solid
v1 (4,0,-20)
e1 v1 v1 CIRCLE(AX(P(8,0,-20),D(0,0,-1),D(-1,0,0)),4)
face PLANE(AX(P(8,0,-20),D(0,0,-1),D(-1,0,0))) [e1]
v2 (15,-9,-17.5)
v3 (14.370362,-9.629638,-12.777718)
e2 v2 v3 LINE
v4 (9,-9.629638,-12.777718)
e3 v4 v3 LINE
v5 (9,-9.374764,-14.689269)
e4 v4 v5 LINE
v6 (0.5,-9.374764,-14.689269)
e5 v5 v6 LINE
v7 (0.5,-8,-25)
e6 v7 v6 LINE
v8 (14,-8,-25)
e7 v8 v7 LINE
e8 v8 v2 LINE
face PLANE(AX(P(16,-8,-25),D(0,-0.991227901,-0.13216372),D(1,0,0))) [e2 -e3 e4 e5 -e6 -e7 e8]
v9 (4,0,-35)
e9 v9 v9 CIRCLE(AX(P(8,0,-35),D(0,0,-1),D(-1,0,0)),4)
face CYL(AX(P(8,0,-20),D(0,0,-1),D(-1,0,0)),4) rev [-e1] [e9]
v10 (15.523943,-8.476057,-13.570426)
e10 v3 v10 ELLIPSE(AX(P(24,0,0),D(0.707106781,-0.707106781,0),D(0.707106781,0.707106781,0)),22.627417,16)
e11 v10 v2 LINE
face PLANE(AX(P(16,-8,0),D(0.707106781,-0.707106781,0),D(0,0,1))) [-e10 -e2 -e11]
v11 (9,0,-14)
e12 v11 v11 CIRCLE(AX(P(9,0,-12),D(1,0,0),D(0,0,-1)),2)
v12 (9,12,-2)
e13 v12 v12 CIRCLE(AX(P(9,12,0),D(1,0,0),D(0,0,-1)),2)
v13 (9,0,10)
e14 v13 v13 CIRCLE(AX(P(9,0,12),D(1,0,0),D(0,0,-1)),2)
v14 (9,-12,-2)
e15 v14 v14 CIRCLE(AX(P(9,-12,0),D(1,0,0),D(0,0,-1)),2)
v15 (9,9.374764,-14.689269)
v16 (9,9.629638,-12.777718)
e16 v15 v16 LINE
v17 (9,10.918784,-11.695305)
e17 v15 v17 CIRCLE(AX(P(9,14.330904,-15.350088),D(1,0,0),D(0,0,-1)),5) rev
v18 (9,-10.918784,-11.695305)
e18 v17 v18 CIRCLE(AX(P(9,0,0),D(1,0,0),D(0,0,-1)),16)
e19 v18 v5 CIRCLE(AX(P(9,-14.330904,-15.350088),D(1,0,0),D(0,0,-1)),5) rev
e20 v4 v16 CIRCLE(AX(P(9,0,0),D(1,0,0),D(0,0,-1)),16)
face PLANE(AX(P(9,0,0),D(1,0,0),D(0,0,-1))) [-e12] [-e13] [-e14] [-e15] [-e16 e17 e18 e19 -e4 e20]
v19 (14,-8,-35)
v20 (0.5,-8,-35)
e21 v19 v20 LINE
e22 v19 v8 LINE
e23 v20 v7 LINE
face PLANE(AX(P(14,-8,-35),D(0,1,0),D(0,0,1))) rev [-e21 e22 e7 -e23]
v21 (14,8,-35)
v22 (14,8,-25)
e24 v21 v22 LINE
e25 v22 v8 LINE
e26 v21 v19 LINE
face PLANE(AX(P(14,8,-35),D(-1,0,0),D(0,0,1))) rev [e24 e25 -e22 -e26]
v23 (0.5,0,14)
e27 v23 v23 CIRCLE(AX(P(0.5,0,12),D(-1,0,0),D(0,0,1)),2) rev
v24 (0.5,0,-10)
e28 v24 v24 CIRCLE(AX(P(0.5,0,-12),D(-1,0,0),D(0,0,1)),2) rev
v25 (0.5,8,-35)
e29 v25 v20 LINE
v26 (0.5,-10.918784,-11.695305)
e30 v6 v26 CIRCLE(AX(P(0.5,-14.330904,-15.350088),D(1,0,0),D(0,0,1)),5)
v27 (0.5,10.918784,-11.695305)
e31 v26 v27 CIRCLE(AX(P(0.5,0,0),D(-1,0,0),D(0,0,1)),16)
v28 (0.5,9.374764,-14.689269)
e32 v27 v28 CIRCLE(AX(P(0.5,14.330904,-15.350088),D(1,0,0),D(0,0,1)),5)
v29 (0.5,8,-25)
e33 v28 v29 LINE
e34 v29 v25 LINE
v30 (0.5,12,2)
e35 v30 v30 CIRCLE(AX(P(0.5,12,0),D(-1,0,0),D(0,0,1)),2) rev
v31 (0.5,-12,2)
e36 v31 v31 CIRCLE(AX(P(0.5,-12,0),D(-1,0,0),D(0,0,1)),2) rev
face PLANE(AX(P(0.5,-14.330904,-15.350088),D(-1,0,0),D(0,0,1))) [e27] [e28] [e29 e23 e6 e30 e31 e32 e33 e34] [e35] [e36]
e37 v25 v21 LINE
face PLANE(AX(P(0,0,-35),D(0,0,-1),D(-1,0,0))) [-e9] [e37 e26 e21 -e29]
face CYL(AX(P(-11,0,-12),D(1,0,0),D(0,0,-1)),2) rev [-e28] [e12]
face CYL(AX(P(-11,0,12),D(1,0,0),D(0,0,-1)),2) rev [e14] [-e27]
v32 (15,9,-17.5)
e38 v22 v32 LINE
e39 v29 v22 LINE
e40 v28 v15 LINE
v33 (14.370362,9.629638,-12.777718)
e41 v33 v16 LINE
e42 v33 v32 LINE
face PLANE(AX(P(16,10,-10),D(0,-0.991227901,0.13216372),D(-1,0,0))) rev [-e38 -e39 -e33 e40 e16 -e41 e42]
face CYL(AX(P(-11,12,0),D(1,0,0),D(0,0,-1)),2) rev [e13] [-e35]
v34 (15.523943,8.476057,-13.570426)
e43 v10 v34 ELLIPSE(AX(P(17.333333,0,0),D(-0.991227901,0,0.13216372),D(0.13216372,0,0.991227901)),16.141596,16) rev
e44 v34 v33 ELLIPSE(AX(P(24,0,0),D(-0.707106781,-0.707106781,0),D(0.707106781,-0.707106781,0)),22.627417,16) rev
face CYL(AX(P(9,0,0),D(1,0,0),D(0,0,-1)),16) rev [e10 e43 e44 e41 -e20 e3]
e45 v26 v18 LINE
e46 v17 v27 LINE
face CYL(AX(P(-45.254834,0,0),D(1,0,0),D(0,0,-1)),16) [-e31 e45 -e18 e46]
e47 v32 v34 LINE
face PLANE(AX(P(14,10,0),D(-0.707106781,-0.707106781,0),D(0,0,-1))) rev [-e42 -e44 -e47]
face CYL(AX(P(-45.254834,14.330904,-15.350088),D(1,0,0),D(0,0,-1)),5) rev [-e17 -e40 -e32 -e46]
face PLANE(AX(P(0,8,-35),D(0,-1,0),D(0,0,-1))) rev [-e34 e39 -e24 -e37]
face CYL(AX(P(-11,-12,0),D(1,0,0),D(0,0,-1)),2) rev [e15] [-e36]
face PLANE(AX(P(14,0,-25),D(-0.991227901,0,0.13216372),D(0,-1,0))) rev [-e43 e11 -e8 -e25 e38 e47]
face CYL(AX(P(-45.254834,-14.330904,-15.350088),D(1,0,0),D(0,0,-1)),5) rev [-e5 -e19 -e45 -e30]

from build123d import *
from OCP.BRepFilletAPI import BRepFilletAPI_MakeChamfer

# Parameters (mm, degrees)
BOSS_EXTRUDE1_DEPTH = 16
CHAMFER1_SIZE       = 15
CHAMFER1_SIZE2      = 2
SKETCH2_R           = 3
CUT_EXTRUDE1_DEPTH  = 15
CHAMFER2_SIZE       = 2
THREAD1_PITCH       = 1.5
SKETCH5_R           = 7
BOSS_EXTRUDE2_DEPTH = 16
BOSS_EXTRUDE3_START = 10
SKETCH10_W          = 14
SKETCH10_H          = 16
SKETCH10_R          = 3
BOSS_EXTRUDE3_DEPTH = 10
BOSS_EXTRUDE4_START = 10
SKETCH11_R          = 3
BOSS_EXTRUDE4_DEPTH = 10
SKETCH12_R          = 16
CUT_EXTRUDE2_DEPTH  = 7
SKETCH13_R          = 16
BOSS_EXTRUDE5_DEPTH = 9
BOSS_EXTRUDE6_START = -9
BOSS_EXTRUDE6_DEPTH = 9
SKETCH15_R          = 2
CUT_EXTRUDE3_DEPTH  = 20
FILLET1_R           = 5
FILLET2_R           = 5
CUT_EXTRUDE4_START  = -0.5
CUT_EXTRUDE4_DEPTH  = 0.5
SKETCH17_R          = 4
CUT_EXTRUDE5_DEPTH  = 15


with BuildPart() as part:
    # Sketch1 → Boss-Extrude1 (new body)
    with BuildSketch(Plane(origin=(0, 0, 0), x_dir=(0, -1, 0), z_dir=(1, 0, 0))):
        with BuildLine():
            ThreePointArc((-10, 0), (0, 10), (10, 0))
            Line((10, 0), (10, 25))
            Line((10, 25), (-10, 25))
            Line((-10, 25), (-10, 0))
        make_face()
        with BuildLine():
            ThreePointArc((-4.5, 0), (0, 4.5), (4.5, 0))
            Line((4.5, 0), (10, 0))
            ThreePointArc((10, 0), (0, 10), (-10, 0))
            Line((-10, 0), (-4.5, 0))
        make_face()
        with BuildLine():
            Line((10, 0), (4.5, 0))
            ThreePointArc((4.5, 0), (0, -4.5), (-4.5, 0))
            Line((-4.5, 0), (-10, 0))
            ThreePointArc((-10, 0), (0, -10), (10, 0))
        make_face()
    extrude(amount=BOSS_EXTRUDE1_DEPTH)

    # Chamfer1: one chamfer whose edges measure the first distance from different faces: ONE call of the kernel's chamfer builder (chamfer() names one face for all edges)
    chamfer1_edges_1 = [part.edges().sort_by_distance(p)[0] for p in [
        (8, 10, -25),
    ]]
    chamfer1_side_1 = [part.faces().sort_by_distance(p)[0] for p in [
        (8, 10, -12.5),
    ]]
    chamfer1_edges_2 = [part.edges().sort_by_distance(p)[0] for p in [
        (8, -10, -25),
    ]]
    chamfer1_side_2 = [part.faces().sort_by_distance(p)[0] for p in [
        (8, -10, -12.5),
    ]]
    chamfer1_edges_3 = [part.edges().sort_by_distance(p)[0] for p in [
        (16, 0, -25),
    ]]
    chamfer1_side_3 = [part.faces().sort_by_distance(p)[0] for p in [
        (16, 0, -9.408066135),
    ]]
    chamfer1 = BRepFilletAPI_MakeChamfer(part.part.solid().wrapped)
    for e in chamfer1_edges_1:
        chamfer1.Add(CHAMFER1_SIZE, CHAMFER1_SIZE2, e.wrapped, chamfer1_side_1[0].wrapped)  # the first distance lies on this face
    for e in chamfer1_edges_2:
        chamfer1.Add(CHAMFER1_SIZE, CHAMFER1_SIZE2, e.wrapped, chamfer1_side_2[0].wrapped)  # the first distance lies on this face
    for e in chamfer1_edges_3:
        chamfer1.Add(CHAMFER1_SIZE, CHAMFER1_SIZE2, e.wrapped, chamfer1_side_3[0].wrapped)  # the first distance lies on this face
    add(Compound.cast(chamfer1.Shape()), mode=Mode.REPLACE)

    # Sketch2 → Cut-Extrude1 (cut)
    with BuildSketch(Plane(origin=(0, 0, -25), x_dir=(-1, 0, 0), z_dir=(0, 0, -1))):
        with Locations((-8, 0)):
            Circle(SKETCH2_R)
    extrude(amount=-CUT_EXTRUDE1_DEPTH, mode=Mode.SUBTRACT)

    # Chamfer2
    chamfer2_edges = [part.edges().sort_by_distance(p)[0] for p in [
        (0, 0, 10),
        (16, 0, 10),
        (16, 10, -5),
        (0, 10, -5),
        (0, -10, -5),
        (16, -10, -5),
    ]]
    chamfer(chamfer2_edges, length=CHAMFER2_SIZE)

    # Thread1: the profile of Thread Profile1 profile screwed along a right-hand helix of 11.333333 turns, 8 arcs to a turn; built about Z, then put on its axis
    thread1_z = Axis((0, 0, 0), (0, 0, 1))
    thread1_corners = [(4.4997, 0, -0.000173205), (5.311898812, 0, 0.468749998), (5.311898812, 0, 0.656249998), (4.4997, 0, 1.125173201)]
    with BuildLine(mode=Mode.PRIVATE) as thread1_profile:
        Line(thread1_corners[0], thread1_corners[1])
        Line(thread1_corners[1], thread1_corners[2])
        Line(thread1_corners[2], thread1_corners[3])
        Line(thread1_corners[3], thread1_corners[0])
    thread1_cap = Face(thread1_profile.wire())
    thread1_turn_angles = [0, 22.5, 45, 67.5, 90, 112.5, 135, 157.5, 180, 202.5, 225, 247.5, 270, 292.5, 315, 337.5, 360]
    thread1_turn_weights = [1, 0.9238795325112867, 1, 0.9238795325112867, 1, 0.9238795325112867, 1, 0.9238795325112867, 1, 0.9238795325112867, 1, 0.9238795325112867, 1, 0.9238795325112867, 1, 0.9238795325112867, 1]
    thread1_turn_rails = [Edge.make_bspline([Vector(p[0], p[1], 0).rotate(thread1_z, thread1_turn_angles[k]) / thread1_turn_weights[k] + Vector(0, 0, p[2] + THREAD1_PITCH * thread1_turn_angles[k] / 360) for k in range(17)], [0, 0, 0, 1, 1, 2, 2, 3, 3, 4, 4, 5, 5, 6, 6, 7, 7, 8, 8, 8], 2, thread1_turn_weights) for p in thread1_corners]
    thread1_turn_sides = [Face.make_surface_from_curves(thread1_turn_rails[p[0]], thread1_turn_rails[p[1]]) for p in [(0, 1), (1, 2), (2, 3), (3, 0)]]
    thread1_last_angles = [3960, 3982.5, 4005, 4027.5, 4050, 4065, 4080]
    thread1_last_weights = [1, 0.9238795325112867, 1, 0.9238795325112867, 1, 0.9659258262890693, 1]
    thread1_last_rails = [Edge.make_bspline([Vector(p[0], p[1], 0).rotate(thread1_z, thread1_last_angles[k]) / thread1_last_weights[k] + Vector(0, 0, p[2] + THREAD1_PITCH * thread1_last_angles[k] / 360) for k in range(7)], [0, 0, 0, 1, 1, 2, 2, 3, 3, 3], 2, thread1_last_weights) for p in thread1_corners]
    thread1_last_sides = [Face.make_surface_from_curves(thread1_last_rails[p[0]], thread1_last_rails[p[1]]) for p in [(0, 1), (1, 2), (2, 3), (3, 0)]]
    thread1 = Plane(origin=(-1, 0, 0), x_dir=(0, 0, -1), z_dir=(1, 0, 0)) * Solid(Shell([*[p.moved(Location((0, 0, THREAD1_PITCH * i))) for i in range(11) for p in thread1_turn_sides], *thread1_last_sides, thread1_cap, thread1_cap.rotate(thread1_z, 4080).moved(Location((0, 0, THREAD1_PITCH * 4080 / 360)))]))
    add(thread1, mode=Mode.SUBTRACT)

    # Sketch5 → Boss-Extrude2 (add)
    with BuildSketch(Plane.ZY):
        Circle(SKETCH5_R)
    extrude(amount=-BOSS_EXTRUDE2_DEPTH)

    # Sketch10 → Boss-Extrude3 (add)
    with BuildSketch(Plane(origin=(0, 0, -25), x_dir=(-1, 0, 0), z_dir=(0, 0, -1)).offset(BOSS_EXTRUDE3_START)):
        with Locations((-7, 0)):
            Rectangle(SKETCH10_W, SKETCH10_H)
        with Locations((-8, 0)):
            Circle(SKETCH10_R, mode=Mode.SUBTRACT)
    extrude(amount=-BOSS_EXTRUDE3_DEPTH)

    # Sketch11 → Boss-Extrude4 (add)
    with BuildSketch(Plane(origin=(0, 0, -10), x_dir=(-1, 0, 0), z_dir=(0, 0, -1)).offset(BOSS_EXTRUDE4_START)):
        with Locations((-8, 0)):
            Circle(SKETCH11_R)
    extrude(amount=-BOSS_EXTRUDE4_DEPTH)

    # Sketch12 → Cut-Extrude2 (cut)
    with BuildSketch(Plane(origin=(16, 0, 0), x_dir=(0, 0, -1), z_dir=(1, 0, 0))):
        Circle(SKETCH12_R)
    extrude(amount=-CUT_EXTRUDE2_DEPTH, mode=Mode.SUBTRACT)

    # Sketch13 → Boss-Extrude5 (add)
    with BuildSketch(Plane(origin=(9, 0, 0), x_dir=(0, 0, -1), z_dir=(1, 0, 0))):
        Circle(SKETCH13_R)
    extrude(amount=-BOSS_EXTRUDE5_DEPTH)

    # Sketch14 → Boss-Extrude6 (add)
    with BuildSketch(Plane.ZY.offset(BOSS_EXTRUDE6_START)):
        with BuildLine():
            Line((-25, -8), (-13.856406461, -8))
            ThreePointArc((-13.856406461, -8), (-13.341966778, -8.831303556), (-12.777718105, -9.629637586))
            Line((-12.777718105, -9.629637586), (-25, -8))
        make_face()
        with BuildLine():
            Line((-13.856406461, 8), (-25, 8))
            Line((-25, 8), (-12.777718105, 9.629637586))
            ThreePointArc((-12.777718105, 9.629637586), (-13.341966778, 8.831303556), (-13.856406461, 8))
        make_face()
    extrude(amount=BOSS_EXTRUDE6_DEPTH)

    # Sketch15 → Cut-Extrude3 (cut)
    with BuildSketch(Plane(origin=(9, 0, 0), x_dir=(0, 0, -1), z_dir=(1, 0, 0))):
        with Locations((12, 0)):
            Circle(SKETCH15_R)
        with Locations((0, 12)):
            Circle(SKETCH15_R)
        with Locations((-12, 0)):
            Circle(SKETCH15_R)
        with Locations((0, -12)):
            Circle(SKETCH15_R)
    extrude(amount=-CUT_EXTRUDE3_DEPTH, mode=Mode.SUBTRACT)

    # Fillet1
    fillet1_edges = [part.edges().sort_by_distance(p)[0] for p in [
        (4.5, -9.629637586, -12.777718105),
    ]]
    fillet(fillet1_edges, radius=FILLET1_R)

    # Fillet2
    fillet2_edges = [part.edges().sort_by_distance(p)[0] for p in [
        (4.5, 9.629637586, -12.777718105),
    ]]
    fillet(fillet2_edges, radius=FILLET2_R)

    # Sketch16 → Cut-Extrude4 (cut)
    with BuildSketch(Plane.ZY.offset(CUT_EXTRUDE4_START)):
        with BuildLine():
            Line((-14.689269432, 9.374764076), (-25, 8))
            Line((-25, 8), (-35, 8))
            Line((-35, 8), (-35, -8))
            Line((-35, -8), (-25, -8))
            Line((-25, -8), (-14.689269432, -9.374764076))
            ThreePointArc((-14.689269432, -9.374764076), (-13.058341289, -9.887042998), (-11.695305168, -10.918783679))
            ThreePointArc((-11.695305168, -10.918783679), (16, 0), (-11.695305168, 10.918783679))
            ThreePointArc((-11.695305168, 10.918783679), (-13.058341289, 9.887042998), (-14.689269432, 9.374764076))
        make_face()
    extrude(amount=CUT_EXTRUDE4_DEPTH, mode=Mode.SUBTRACT)

    # Sketch17 → Cut-Extrude5 (cut)
    with BuildSketch(Plane(origin=(0, 0, -35), x_dir=(-1, 0, 0), z_dir=(0, 0, -1))):
        with Locations((-8, 0)):
            Circle(SKETCH17_R)
    extrude(amount=-CUT_EXTRUDE5_DEPTH, mode=Mode.SUBTRACT)


solid = part.part
